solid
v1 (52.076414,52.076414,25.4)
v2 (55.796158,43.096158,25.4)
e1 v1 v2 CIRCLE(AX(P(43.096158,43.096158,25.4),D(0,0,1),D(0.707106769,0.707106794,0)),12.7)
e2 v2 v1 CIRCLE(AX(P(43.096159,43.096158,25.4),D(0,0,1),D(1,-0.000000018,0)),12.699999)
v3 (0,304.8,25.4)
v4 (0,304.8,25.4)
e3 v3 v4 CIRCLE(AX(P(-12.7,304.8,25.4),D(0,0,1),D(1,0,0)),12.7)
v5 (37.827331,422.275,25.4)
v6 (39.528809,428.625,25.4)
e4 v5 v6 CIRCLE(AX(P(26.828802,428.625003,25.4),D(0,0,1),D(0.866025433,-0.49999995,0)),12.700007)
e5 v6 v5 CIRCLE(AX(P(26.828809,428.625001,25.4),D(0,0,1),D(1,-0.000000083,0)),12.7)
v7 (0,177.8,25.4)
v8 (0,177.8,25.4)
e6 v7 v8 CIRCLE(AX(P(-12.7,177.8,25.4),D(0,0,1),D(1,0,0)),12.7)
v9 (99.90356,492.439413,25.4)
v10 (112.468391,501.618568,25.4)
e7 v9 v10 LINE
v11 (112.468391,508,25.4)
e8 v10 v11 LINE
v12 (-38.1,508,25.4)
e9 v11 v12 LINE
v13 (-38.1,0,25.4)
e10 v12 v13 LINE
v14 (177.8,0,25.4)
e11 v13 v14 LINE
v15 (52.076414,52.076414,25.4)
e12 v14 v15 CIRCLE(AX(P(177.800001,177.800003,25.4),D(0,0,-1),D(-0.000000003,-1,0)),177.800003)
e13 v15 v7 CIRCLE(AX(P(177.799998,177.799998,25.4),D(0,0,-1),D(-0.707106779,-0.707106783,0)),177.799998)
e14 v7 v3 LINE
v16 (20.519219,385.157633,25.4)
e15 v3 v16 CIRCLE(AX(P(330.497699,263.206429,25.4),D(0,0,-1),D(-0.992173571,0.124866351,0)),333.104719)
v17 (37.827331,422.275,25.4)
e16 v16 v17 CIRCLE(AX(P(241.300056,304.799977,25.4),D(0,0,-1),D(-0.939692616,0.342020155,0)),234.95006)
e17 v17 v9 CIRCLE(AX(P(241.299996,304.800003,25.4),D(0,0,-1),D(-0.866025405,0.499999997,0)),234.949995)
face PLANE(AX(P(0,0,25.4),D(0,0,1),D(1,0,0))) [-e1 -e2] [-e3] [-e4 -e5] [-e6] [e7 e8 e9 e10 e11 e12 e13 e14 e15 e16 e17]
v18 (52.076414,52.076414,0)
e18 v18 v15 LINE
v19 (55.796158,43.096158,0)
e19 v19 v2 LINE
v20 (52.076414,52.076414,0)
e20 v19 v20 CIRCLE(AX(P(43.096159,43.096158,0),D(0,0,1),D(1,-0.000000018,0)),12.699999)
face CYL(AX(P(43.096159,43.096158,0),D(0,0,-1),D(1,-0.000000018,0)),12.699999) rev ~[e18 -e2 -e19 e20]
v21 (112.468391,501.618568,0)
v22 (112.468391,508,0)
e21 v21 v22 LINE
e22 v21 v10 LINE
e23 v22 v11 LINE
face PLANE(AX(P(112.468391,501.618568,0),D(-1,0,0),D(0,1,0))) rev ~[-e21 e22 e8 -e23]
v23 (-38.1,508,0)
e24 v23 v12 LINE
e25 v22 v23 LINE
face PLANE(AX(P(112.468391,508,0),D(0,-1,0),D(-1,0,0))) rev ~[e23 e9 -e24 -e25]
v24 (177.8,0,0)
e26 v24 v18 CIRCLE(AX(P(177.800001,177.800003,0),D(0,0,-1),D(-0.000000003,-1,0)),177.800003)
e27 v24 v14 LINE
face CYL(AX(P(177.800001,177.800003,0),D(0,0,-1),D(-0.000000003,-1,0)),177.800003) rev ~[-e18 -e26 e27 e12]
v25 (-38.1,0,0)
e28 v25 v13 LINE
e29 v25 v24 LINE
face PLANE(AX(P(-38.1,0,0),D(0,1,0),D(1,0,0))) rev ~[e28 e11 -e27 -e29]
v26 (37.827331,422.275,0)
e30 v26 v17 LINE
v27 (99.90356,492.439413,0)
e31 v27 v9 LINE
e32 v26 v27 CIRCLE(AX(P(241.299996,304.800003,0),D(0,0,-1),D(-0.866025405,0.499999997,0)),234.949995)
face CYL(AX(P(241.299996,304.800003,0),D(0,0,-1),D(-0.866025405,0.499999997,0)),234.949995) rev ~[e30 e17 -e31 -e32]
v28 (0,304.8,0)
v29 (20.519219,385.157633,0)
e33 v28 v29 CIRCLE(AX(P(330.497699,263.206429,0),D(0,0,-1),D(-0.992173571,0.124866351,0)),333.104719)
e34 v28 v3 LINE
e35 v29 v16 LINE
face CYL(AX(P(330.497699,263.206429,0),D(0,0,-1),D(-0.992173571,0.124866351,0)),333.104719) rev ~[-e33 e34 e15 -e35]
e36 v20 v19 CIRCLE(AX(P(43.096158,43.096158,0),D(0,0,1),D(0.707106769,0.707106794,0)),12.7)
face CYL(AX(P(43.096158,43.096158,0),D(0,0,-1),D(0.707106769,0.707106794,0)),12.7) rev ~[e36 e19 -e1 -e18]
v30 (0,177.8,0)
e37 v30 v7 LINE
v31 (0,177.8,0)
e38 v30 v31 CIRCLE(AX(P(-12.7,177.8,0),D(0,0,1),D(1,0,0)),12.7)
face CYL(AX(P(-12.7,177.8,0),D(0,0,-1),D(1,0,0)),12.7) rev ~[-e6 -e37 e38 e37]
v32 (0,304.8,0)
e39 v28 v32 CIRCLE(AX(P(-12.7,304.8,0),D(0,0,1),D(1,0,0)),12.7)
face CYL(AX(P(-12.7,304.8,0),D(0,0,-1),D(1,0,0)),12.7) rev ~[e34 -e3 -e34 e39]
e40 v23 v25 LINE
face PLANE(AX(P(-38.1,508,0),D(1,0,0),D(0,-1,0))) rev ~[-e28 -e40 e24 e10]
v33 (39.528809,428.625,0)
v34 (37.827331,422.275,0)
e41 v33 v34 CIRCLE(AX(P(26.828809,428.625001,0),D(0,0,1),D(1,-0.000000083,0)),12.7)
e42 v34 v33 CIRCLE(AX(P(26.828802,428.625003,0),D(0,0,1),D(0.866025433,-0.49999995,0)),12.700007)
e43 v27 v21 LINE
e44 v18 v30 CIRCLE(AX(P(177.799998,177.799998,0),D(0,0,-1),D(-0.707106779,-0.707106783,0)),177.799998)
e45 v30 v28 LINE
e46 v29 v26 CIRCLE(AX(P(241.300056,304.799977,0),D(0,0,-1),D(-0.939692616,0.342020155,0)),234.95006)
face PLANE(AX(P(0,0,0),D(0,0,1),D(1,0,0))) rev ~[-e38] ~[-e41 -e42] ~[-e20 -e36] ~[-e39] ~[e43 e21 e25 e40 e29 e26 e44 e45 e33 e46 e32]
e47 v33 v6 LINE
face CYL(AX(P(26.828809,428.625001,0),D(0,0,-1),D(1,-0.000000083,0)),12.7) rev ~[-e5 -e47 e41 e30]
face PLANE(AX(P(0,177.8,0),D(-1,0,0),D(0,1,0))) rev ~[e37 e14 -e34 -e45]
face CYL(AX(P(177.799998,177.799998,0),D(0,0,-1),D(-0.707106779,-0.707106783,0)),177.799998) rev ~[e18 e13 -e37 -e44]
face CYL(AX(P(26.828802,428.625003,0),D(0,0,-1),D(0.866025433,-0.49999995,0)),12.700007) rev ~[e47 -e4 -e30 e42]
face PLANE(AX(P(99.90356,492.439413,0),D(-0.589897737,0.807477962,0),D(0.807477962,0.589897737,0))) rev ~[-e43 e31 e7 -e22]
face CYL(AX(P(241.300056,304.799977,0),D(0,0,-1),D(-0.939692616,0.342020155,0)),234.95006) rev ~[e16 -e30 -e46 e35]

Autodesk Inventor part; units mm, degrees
ref_plane "YZ Plane" through (0, 0, 0) normal (1, 0, 0) x (0, 1, 0)
ref_plane "XZ Plane" through (0, 0, 0) normal (0, 1, 0) x (-1, 0, 0)
ref_plane "XY Plane" through (0, 0, 0) normal (0, 0, 1) x (1, 0, 0)
sketch "Sketch1" plane through (0, 0, 0) normal (0, 0, 1) x (1, 0, 0)
  line L0 (0, 0) -> (609.6, 0) construction
  line L1 (609.6, 0) -> (609.6, 209.55)
  line L2 (609.6, 209.55) -> (0, 209.55) construction
  line L3 (0, 209.55) -> (0, 0) construction
  line L4 (0, 0) -> (304.8, 0) construction
  line L5 (304.8, 0) -> (304.8, 165.1) construction
  line L6 (304.8, 165.1) -> (0, 165.1) construction
  line L7 (0, 165.1) -> (0, 0) construction
  line L8 (0, 0) -> (165.1, 0) construction
  line L9 (165.1, 0) -> (165.1, 304.8) construction
  line L10 (165.1, 304.8) -> (0, 304.8) construction
  line L11 (0, 304.8) -> (0, 0) construction
  line L12 (0, 0) -> (177.8, 0) construction
  line L13 (177.8, 0) -> (177.8, 177.8) construction
  line L14 (177.8, 177.8) -> (0, 177.8) construction
  line L15 (0, 177.8) -> (0, 0) construction
  circle A0 centre (177.8, 177.8) radius 12.7
  line L16 (177.8, 177.8) -> (165.1, 177.8)
  line L17 (177.8, 177.8) -> (177.8, 165.1)
  line L18 (177.8, 177.8) -> (168.819744, 168.819744)
  line L19 (177.8, 177.8) -> (190.5, 177.8) construction
  line L20 (168.819744, 168.819744) -> (52.076414, 52.076414) construction
  line L21 (168.819744, 168.819744) -> (333.919744, 168.819744) construction
  line L22 (177.8, 165.1) -> (177.8, 0) construction
  line L23 (165.1, 177.8) -> (0, 177.8) construction
  arc A1 (0, 177.8) -> (177.8, 0) centre (177.8, 177.8) ccw
  line L24 (177.8, 177.8) -> (355.6, 177.8) construction
  line L25 (355.6, 177.8) -> (355.6, 193.675)
  line L26 (355.6, 193.675) -> (177.8, 193.675) construction
  line L27 (177.8, 193.675) -> (177.8, 177.8) construction
  circle A2 centre (355.6, 193.675) radius 12.7
  line L28 (355.6, 193.675) -> (482.6, 193.675) construction
  line L29 (482.6, 193.675) -> (482.6, 209.55) construction
  line L30 (482.6, 209.55) -> (355.6, 209.55) construction
  line L31 (355.6, 209.55) -> (355.6, 193.675) construction
  circle A3 centre (482.6, 209.55) radius 12.7
  line L32 (177.8, 0) -> (609.6, 0)
  line L33 (177.8, 165.1) -> (355.6, 180.975)
  line L34 (482.6, 196.85) -> (355.6, 180.975)
  line L35 (482.6, 196.85) -> (609.6, 209.55)
  line L36 (165.1, 177.8) -> (165.1, 304.8) construction
  line L37 (165.1, 304.8) -> (241.3, 304.8) construction
  circle A4 centre (241.3, 304.8) radius 76.2
  circle A5 centre (177.8, 228.6) radius 12.7
  line L38 (177.8, 177.8) -> (177.8, 228.6)
  line L39 (0, 177.8) -> (0, 304.8)
  line L40 (241.3, 304.8) -> (195.441695, 365.656026) construction
  line L41 (241.3, 304.8) -> (317.5, 304.8) construction
  line L42 (195.441695, 365.656026) -> (354.191695, 365.656026) construction
  line L43 (195.441695, 365.656026) -> (99.90356, 492.439413) construction
  line L44 (195.441695, 365.656026) -> (354.191695, 365.656026) construction
  line L45 (165.1, 304.8) -> (0, 304.8) construction
  line L46 (241.3, 304.8) -> (169.695422, 330.861935) construction
  line L47 (241.3, 304.8) -> (317.5, 304.8) construction
  line L48 (169.695422, 330.861935) -> (20.519219, 385.157633) construction
  line L49 (177.8, 0) -> (408.09644, 0) construction
  line L50 (241.3, 304.8) -> (317.5, 304.8) construction
  line L51 (241.3, 304.8) -> (175.308864, 342.9) construction
  line L52 (241.3, 304.8) -> (317.5, 304.8) construction
  line L53 (175.308864, 342.9) -> (37.827331, 422.275) construction
  arc A6 (99.90356, 492.439413) -> (20.519219, 385.157633) centre (241.3, 304.8) ccw
  arc A7 (37.827331, 422.275) -> (0, 304.8) centre (330.4977, 263.206429) ccw
  line L54 (37.827331, 422.275) -> (26.828809, 428.625) construction
  circle A8 centre (26.828809, 428.625) radius 12.7
  line L55 (0, 304.8) -> (-12.7, 304.8) construction
  circle A9 centre (-12.7, 304.8) radius 12.7
  line L56 (0, 177.8) -> (-12.7, 177.8) construction
  circle A10 centre (-12.7, 177.8) radius 12.7
  line L57 (52.076414, 52.076414) -> (43.096158, 43.096158) construction
  circle A11 centre (43.096158, 43.096158) radius 12.7
  line L58 (0, 177.8) -> (0, 304.8)
  circle A12 centre (43.096158, 43.096158) radius 11.1125
  circle A13 centre (-12.7, 304.8) radius 11.1125
  circle A14 centre (-12.7, 177.8) radius 11.1125
  circle A15 centre (26.828809, 428.625) radius 11.1125
  line L59 (190.5, 177.8) -> (393.7, 177.8) construction
  line L60 (609.6, 0) -> (-38.1, 0)
  line L61 (-38.1, 0) -> (-38.1, 508)
  line L62 (177.8, 0) -> (-38.1, 0)
  line L63 (-38.1, 508) -> (112.468391, 501.618568)
  line L64 (112.468391, 501.618568) -> (99.90356, 492.439413)
  line L65 (112.468391, 501.618568) -> (-38.1, 501.618568)
  line L66 (-38.1, 501.618568) -> (-38.1, 508)
  line L67 (-38.1, 508) -> (112.468391, 508)
  line L68 (112.468391, 508) -> (112.468391, 501.618568)
  point P0 (165.275068, 230.701449)
  point P1 (172.715134, 216.962383)
  dimension "d16" = 25.4
  dimension "d19" = 25.4
  dimension "d0" = 609.6
  dimension "d1" = 209.55
  dimension "d2" = 304.8
  dimension "d3" = 165.1
  dimension "d4" = 165.1
  dimension "d5" = 304.8
  dimension "d6" = 177.8
  dimension "d7" = 177.8
  dimension "d8" = 25.4
  dimension "d9" = 12.7
  dimension "d10" = 135
  dimension "d11" = 165.1
  dimension "d12" = 135
  dimension "d13" = 165.1
  dimension "d14" = 177.8
  dimension "d15" = 15.875
  dimension "d17" = 127
  dimension "d18" = 15.875
  dimension "d20" = 127
  dimension "d21" = 76.2
  dimension "d22" = 152.4
  dimension "d23" = 25.4
  dimension "d24" = 50.8
  dimension "d25" = 127
  dimension "d26" = 127
  dimension "d33" = 158.75
  dimension "d34" = 127
  dimension "d35" = 160
  dimension "d36" = 158.75
  dimension "d37" = 180
  dimension "d45" = 150
  dimension "d46" = 158.75
  dimension "d47" = 180
  dimension "d48" = 12.7
  dimension "d49" = 12.7
  dimension "d50" = 12.7
  dimension "d52" = 12.7
  dimension "d53" = 25.4
  dimension "d55" = 214.47119
  dimension "d56" = 22.225
  dimension "d57" = 22.225
  dimension "d58" = 22.225
  dimension "d59" = 22.225
  dimension "d60" = 134.70384
  dimension "d72" = 647.7
  dimension "d73" = 508
  dimension "d74" = 90
  dimension "d77" = 150.70356
  dimension "d78" = 15.56059
sketch "Sketch1 outline for Extrusion3" plane through (0, 0, 0) normal (0, 0, 1) x (1, 0, 0)
  line L0 (-38.1, 508) -> (-38.1, 0)
  line L1 (112.468391, 508) -> (-38.1, 508)
  line L2 (112.468391, 501.618568) -> (112.468391, 508)
  line L3 (99.90356, 492.439413) -> (112.468391, 501.618568)
  arc A0 (37.827331, 422.275) -> (99.90356, 492.439413) centre (241.3, 304.8) cw
  arc A1 (20.519219, 385.157633) -> (37.827331, 422.275) centre (241.3, 304.8) cw
  arc A2 (0, 304.8) -> (20.519219, 385.157633) centre (330.4977, 263.206429) cw
  line L4 (0, 177.8) -> (0, 304.8)
  arc A3 (52.076414, 52.076414) -> (0, 177.8) centre (177.8, 177.8) cw
  arc A4 (177.8, 0) -> (52.076414, 52.076414) centre (177.8, 177.8) cw
  line L5 (-38.1, 0) -> (177.8, 0)
  circle A5 centre (-12.7, 177.8) radius 12.7
  arc A6 (52.076414, 52.076414) -> (55.796158, 43.096158) centre (43.096158, 43.096158) ccw
  arc A7 (55.796158, 43.096158) -> (52.076414, 52.076414) centre (43.096158, 43.096158) ccw
  circle A8 centre (-12.7, 304.8) radius 12.7
  arc A9 (37.827331, 422.275) -> (39.528809, 428.625) centre (26.828809, 428.625) ccw
  arc A10 (39.528809, 428.625) -> (37.827331, 422.275) centre (26.828809, 428.625) ccw
extrude "Extrusion3" add sketch "Sketch1 outline for Extrusion3" along normal blind 25.4
